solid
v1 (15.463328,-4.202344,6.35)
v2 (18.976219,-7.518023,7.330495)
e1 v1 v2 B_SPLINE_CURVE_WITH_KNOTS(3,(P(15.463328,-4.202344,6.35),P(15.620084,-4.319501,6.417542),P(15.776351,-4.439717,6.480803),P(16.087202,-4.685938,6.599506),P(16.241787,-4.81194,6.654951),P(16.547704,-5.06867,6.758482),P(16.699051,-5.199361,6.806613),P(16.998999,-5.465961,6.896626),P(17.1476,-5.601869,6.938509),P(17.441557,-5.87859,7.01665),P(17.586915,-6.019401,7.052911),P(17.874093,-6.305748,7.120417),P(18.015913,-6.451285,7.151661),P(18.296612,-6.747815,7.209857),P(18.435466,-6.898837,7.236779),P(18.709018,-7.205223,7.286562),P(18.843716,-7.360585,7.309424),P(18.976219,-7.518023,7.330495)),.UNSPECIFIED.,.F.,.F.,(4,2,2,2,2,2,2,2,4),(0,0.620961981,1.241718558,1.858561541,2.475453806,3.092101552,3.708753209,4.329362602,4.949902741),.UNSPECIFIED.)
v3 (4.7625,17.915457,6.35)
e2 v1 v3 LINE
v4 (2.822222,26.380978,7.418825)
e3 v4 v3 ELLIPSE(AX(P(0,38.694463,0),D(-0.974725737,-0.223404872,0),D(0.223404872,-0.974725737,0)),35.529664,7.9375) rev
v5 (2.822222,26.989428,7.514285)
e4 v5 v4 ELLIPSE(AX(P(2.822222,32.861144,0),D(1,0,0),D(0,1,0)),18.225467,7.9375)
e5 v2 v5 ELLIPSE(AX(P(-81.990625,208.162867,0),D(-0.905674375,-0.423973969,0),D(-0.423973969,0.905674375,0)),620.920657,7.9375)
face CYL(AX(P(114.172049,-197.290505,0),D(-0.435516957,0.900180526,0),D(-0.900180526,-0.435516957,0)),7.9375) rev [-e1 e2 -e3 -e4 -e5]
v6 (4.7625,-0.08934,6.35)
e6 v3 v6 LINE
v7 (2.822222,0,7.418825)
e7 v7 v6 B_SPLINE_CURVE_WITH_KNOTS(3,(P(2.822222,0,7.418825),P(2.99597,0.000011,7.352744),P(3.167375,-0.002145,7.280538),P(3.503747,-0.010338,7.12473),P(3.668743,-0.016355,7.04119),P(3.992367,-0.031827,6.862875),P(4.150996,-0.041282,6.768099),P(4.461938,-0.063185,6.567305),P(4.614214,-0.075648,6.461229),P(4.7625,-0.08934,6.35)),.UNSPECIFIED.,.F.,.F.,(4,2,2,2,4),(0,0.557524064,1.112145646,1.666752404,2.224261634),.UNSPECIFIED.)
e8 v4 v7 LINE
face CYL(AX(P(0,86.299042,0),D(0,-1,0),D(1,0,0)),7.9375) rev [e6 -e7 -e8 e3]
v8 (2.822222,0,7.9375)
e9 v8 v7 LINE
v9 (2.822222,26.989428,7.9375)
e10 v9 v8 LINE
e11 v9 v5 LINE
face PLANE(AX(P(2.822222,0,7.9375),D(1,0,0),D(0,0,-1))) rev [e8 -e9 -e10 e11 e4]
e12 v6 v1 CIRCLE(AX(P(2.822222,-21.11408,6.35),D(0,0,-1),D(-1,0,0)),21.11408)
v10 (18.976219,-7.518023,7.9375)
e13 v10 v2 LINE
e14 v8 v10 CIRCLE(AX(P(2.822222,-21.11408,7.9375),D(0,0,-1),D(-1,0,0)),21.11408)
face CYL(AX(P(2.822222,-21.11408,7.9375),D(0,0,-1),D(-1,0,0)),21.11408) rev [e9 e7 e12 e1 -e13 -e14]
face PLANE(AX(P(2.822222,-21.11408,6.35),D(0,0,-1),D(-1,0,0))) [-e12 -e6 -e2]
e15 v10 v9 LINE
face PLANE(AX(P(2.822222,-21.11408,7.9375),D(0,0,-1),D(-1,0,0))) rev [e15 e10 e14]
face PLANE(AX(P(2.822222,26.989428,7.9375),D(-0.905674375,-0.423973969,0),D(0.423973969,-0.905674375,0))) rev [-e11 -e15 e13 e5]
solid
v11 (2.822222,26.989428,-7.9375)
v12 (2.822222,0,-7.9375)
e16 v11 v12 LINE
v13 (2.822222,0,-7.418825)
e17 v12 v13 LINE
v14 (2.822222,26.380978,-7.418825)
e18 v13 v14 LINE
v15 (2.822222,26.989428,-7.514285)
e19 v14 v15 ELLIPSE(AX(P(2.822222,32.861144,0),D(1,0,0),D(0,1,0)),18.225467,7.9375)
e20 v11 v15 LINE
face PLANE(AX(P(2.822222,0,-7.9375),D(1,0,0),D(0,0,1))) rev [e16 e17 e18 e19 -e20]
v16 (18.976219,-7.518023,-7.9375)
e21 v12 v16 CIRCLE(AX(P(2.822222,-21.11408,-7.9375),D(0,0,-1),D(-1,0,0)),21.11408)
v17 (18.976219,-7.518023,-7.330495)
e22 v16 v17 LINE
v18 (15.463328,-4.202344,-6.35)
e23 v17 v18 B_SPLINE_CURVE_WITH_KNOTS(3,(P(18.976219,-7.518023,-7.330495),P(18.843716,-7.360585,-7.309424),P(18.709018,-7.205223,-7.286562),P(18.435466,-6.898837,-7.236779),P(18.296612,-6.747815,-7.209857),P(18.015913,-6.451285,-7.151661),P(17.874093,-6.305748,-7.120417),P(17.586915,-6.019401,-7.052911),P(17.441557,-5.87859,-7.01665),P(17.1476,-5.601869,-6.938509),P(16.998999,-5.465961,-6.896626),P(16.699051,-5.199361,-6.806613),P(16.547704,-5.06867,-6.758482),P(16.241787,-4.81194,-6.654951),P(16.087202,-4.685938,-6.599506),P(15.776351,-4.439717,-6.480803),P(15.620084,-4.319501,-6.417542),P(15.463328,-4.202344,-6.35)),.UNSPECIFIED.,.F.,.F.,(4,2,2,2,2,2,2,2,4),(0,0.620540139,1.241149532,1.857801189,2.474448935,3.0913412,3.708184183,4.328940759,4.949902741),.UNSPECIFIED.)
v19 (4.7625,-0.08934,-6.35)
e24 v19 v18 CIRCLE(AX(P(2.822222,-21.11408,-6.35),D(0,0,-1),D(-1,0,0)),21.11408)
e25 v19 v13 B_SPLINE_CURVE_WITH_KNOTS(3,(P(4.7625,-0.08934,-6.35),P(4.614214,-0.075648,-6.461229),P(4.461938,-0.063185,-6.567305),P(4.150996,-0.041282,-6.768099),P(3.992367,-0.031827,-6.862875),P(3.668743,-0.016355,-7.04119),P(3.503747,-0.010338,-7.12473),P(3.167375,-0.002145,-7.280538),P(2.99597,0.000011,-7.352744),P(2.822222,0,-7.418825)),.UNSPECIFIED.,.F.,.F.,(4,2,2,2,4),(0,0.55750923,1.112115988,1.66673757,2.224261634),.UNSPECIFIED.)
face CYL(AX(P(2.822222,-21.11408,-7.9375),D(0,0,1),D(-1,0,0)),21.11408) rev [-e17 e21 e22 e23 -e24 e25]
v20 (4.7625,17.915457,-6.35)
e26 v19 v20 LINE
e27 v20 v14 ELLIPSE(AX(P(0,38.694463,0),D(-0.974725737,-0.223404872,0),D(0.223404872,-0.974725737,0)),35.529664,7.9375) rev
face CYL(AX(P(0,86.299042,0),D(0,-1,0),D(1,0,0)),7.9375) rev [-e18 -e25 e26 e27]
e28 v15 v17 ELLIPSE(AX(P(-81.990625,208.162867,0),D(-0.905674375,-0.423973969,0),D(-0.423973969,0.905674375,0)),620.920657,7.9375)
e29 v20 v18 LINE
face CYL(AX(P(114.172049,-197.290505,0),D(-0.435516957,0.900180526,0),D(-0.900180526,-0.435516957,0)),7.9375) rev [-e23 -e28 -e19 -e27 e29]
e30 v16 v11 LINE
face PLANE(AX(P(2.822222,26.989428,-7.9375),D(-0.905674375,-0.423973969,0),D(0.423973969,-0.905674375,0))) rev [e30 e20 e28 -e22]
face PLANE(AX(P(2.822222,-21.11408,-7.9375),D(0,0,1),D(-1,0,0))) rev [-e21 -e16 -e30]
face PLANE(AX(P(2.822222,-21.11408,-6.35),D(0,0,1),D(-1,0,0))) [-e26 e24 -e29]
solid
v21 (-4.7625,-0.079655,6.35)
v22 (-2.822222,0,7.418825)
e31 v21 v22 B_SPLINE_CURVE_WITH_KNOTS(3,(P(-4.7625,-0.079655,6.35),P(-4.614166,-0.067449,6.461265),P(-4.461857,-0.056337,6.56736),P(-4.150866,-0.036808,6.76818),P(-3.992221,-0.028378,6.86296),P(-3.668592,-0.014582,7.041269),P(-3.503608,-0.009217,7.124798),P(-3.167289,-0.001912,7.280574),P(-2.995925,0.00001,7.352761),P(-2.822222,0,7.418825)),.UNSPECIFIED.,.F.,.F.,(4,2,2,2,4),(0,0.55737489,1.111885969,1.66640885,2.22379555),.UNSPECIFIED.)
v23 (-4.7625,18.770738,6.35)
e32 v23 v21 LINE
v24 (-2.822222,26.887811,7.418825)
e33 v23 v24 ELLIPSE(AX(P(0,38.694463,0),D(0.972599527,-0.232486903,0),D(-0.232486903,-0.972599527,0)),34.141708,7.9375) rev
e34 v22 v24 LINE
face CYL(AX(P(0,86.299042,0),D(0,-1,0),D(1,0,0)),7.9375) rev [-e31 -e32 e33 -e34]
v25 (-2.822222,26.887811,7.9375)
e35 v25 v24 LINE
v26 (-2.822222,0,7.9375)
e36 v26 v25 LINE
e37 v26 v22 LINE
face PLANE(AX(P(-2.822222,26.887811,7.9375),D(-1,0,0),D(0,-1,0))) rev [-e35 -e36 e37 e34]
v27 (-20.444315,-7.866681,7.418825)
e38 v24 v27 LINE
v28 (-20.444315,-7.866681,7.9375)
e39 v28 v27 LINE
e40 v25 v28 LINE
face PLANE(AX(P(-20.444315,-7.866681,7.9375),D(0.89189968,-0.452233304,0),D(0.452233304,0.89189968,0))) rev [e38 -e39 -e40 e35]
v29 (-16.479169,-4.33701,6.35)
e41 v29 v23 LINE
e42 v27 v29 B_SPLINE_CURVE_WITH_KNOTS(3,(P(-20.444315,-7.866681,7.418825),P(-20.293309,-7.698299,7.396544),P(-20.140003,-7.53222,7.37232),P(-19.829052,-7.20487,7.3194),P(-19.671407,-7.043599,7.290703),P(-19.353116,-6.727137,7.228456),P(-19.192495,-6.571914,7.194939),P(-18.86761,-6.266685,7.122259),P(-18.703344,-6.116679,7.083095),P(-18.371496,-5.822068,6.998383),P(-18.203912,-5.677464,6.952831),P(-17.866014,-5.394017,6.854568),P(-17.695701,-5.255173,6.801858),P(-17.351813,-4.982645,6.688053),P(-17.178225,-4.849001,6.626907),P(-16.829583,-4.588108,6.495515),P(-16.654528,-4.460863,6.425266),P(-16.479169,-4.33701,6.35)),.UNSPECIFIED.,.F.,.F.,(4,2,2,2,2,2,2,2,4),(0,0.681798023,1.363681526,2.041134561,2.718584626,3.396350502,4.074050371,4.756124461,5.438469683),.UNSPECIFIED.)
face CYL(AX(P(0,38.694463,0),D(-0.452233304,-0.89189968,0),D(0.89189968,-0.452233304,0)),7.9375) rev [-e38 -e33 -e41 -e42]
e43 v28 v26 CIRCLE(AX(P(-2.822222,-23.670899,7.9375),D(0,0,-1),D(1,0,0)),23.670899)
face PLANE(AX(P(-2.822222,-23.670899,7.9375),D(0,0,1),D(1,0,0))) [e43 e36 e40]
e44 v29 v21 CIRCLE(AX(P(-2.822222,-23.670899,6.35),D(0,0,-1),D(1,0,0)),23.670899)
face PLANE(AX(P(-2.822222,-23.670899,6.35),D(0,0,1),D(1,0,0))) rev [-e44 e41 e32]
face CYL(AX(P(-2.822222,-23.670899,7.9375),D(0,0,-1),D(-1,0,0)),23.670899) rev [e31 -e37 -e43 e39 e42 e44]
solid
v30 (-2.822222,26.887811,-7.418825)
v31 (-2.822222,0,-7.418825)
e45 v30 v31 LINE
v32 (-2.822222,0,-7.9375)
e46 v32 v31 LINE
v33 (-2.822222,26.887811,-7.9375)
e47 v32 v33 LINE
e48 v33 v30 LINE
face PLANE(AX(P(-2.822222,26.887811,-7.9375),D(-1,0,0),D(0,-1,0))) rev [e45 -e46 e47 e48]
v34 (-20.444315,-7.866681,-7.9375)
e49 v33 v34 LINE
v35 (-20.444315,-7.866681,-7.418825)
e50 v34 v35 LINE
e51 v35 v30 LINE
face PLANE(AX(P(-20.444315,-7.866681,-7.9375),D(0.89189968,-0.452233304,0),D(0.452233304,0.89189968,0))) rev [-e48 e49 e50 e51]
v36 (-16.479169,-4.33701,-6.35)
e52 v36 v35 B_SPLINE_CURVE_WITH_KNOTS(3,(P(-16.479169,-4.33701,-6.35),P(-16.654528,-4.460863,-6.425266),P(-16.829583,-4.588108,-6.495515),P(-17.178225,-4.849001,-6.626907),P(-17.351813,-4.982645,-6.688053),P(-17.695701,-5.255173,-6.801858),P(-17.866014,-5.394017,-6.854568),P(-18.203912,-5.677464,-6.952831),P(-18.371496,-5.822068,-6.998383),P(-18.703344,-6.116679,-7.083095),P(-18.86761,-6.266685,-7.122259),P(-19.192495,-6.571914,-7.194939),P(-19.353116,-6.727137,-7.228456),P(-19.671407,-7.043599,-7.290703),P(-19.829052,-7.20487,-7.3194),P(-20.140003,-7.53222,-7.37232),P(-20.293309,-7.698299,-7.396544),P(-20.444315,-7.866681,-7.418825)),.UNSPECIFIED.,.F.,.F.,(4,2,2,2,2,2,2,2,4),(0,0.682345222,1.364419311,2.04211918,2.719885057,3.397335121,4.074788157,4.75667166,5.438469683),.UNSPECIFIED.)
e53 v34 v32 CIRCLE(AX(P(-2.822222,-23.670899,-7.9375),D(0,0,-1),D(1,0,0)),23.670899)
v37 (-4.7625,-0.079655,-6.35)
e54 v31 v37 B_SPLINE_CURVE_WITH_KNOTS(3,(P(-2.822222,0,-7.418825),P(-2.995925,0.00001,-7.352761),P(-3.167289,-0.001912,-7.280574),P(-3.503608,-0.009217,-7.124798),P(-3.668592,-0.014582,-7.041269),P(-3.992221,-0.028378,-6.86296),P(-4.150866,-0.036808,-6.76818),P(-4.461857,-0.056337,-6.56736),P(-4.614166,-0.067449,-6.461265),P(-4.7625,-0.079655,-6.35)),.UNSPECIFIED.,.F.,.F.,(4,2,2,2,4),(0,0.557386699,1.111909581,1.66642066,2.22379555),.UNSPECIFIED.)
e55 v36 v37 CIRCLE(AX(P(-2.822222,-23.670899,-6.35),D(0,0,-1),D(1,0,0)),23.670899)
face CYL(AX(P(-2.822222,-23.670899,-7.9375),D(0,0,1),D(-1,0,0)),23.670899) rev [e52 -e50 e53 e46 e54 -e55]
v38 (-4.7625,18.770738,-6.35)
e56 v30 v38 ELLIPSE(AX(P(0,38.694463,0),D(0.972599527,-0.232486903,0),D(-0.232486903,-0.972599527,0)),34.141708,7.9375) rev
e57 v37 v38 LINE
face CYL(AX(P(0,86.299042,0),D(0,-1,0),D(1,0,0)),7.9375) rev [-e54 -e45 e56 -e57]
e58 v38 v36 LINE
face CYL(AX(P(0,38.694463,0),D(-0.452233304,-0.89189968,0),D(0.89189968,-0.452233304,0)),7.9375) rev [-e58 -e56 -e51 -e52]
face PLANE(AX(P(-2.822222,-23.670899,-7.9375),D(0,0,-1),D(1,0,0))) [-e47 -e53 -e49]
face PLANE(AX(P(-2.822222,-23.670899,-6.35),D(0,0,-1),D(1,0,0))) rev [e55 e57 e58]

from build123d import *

# Parameters (mm, degrees)
BOSS_EXTRUDE1_DEPTH   = 1.5875
BOSS_EXTRUDE1_2_DEPTH = 1.5875
CUT_SWEEP1_PROFILE_R  = 7.9375
CUT_SWEEP2_START      = -23.066232356
CUT_SWEEP2_DEPTH      = 38.09827597
CUT_SWEEP3_PROFILE_R  = 7.9375


# Read off the part's stored shape, not the designer's step: Cut-Sweep2
with BuildPart() as part:
    # Sketch3 → Boss-Extrude1 (new body)
    with BuildSketch(Plane.XY.offset(6.35)):
        with BuildLine():
            Line((-20.444314967, -7.866681121), (-2.822222222, 26.887811152))
            Line((-2.822222222, 26.887811152), (-2.822222222, 0))
            ThreePointArc((-2.822222222, 0), (-12.471352035, -2.055956199), (-20.444314967, -7.866681121))
        make_face()
    extrude(amount=BOSS_EXTRUDE1_DEPTH)


with BuildPart() as body_2:
    # Sketch3 → Boss-Extrude1 2 (new body)
    with BuildSketch(Plane.XY.offset(6.35)):
        with BuildLine():
            Line((2.822222222, 0), (2.822222222, 26.989428429))
            Line((2.822222222, 26.989428429), (18.976219439, -7.518023406))
            ThreePointArc((18.976219439, -7.518023406), (11.731098442, -1.97155403), (2.822222222, 0))
        make_face()
    extrude(amount=BOSS_EXTRUDE1_2_DEPTH)


with BuildPart() as body_3:
    # Mirror1: mirrored copy
    add(body_2.part.mirror(Plane.XY))


with BuildPart() as body_4:
    # Mirror1 2: mirrored copy
    add(part.part.mirror(Plane.XY))


with BuildPart() as cut_sweep1_tool:
    # Cut-Sweep1: sweep along a path in Sketch4
    with BuildLine(Plane.XY) as cut_sweep1_path:
        Line((0, 86.299042294), (0, -191.883729254))
    # Cut-Sweep1 profile (on start of the path) → Cut-Sweep1 (sweep)
    with BuildSketch(Plane(origin=(0, 86.299042294, 0), x_dir=(-1, 0, 0), z_dir=(0, -1, 0))):
        Circle(CUT_SWEEP1_PROFILE_R)
    sweep(path=cut_sweep1_path.line)


with BuildPart() as part_1:
    add(part.part)

    # Cut-Sweep1: cut by cut_sweep1_tool
    add(cut_sweep1_tool.part, mode=Mode.SUBTRACT)


with BuildPart() as body_2_1:
    add(body_2.part)

    # Cut-Sweep1: cut by cut_sweep1_tool
    add(cut_sweep1_tool.part, mode=Mode.SUBTRACT)


with BuildPart() as body_3_1:
    add(body_3.part)

    # Cut-Sweep1: cut by cut_sweep1_tool
    add(cut_sweep1_tool.part, mode=Mode.SUBTRACT)


with BuildPart() as body_4_1:
    add(body_4.part)

    # Cut-Sweep1: cut by cut_sweep1_tool
    add(cut_sweep1_tool.part, mode=Mode.SUBTRACT)


with BuildPart() as cut_sweep2_tool:
    # Cut-Sweep2 outline → Cut-Sweep2 (new body)
    with BuildSketch(Plane(origin=(0, 0, 0), x_dir=(0.900180526385369, 0.435516957094164, 0), z_dir=(0.435516957094164, -0.900180526385369, 0)).offset(CUT_SWEEP2_START)):
        with BuildLine():
            ThreePointArc((12.089594916, -6.35), (13.146220171, -7.019287615), (14.294863229, -7.514284553))
            Line((14.294863229, -7.514284553), (16, -8.094569974))
            Line((16, -8.094569974), (16, -6.35))
            Line((16, -6.35), (12.089594916, -6.35))
        make_face()
        with BuildLine():
            Line((12.089594916, 6.35), (16, 6.35))
            Line((16, 6.35), (16, 8.094569974))
            Line((16, 8.094569974), (14.294863229, 7.514284553))
            ThreePointArc((14.294863229, 7.514284553), (13.146220171, 7.019287615), (12.089594916, 6.35))
        make_face()
    extrude(amount=CUT_SWEEP2_DEPTH)


with BuildPart() as body_2_2:
    add(body_2_1.part)

    # Cut-Sweep2: cut by cut_sweep2_tool
    add(cut_sweep2_tool.part, mode=Mode.SUBTRACT)


with BuildPart() as body_3_2:
    add(body_3_1.part)

    # Cut-Sweep2: cut by cut_sweep2_tool
    add(cut_sweep2_tool.part, mode=Mode.SUBTRACT)


with BuildPart() as cut_sweep3_tool:
    # Cut-Sweep3: sweep along a path in Sketch4<12>
    with BuildLine(Plane.XY) as cut_sweep3_path:
        Line((0, 38.694463308), (-114.172049028, -186.476953797))
    # Cut-Sweep3 profile (on start of the path) → Cut-Sweep3 (sweep)
    with BuildSketch(Plane(origin=(0, 38.694463308, 0), x_dir=(-0.8918996796843264, 0.45223330414620744, 0), z_dir=(-0.45223330414620744, -0.8918996796843264, 0))):
        Circle(CUT_SWEEP3_PROFILE_R)
    sweep(path=cut_sweep3_path.line)


with BuildPart() as part_2:
    add(part_1.part)

    # Cut-Sweep3: cut by cut_sweep3_tool
    add(cut_sweep3_tool.part, mode=Mode.SUBTRACT)


with BuildPart() as body_4_2:
    add(body_4_1.part)

    # Cut-Sweep3: cut by cut_sweep3_tool
    add(cut_sweep3_tool.part, mode=Mode.SUBTRACT)


solid = Compound([body_2_2.part, body_3_2.part, part_2.part, body_4_2.part])
